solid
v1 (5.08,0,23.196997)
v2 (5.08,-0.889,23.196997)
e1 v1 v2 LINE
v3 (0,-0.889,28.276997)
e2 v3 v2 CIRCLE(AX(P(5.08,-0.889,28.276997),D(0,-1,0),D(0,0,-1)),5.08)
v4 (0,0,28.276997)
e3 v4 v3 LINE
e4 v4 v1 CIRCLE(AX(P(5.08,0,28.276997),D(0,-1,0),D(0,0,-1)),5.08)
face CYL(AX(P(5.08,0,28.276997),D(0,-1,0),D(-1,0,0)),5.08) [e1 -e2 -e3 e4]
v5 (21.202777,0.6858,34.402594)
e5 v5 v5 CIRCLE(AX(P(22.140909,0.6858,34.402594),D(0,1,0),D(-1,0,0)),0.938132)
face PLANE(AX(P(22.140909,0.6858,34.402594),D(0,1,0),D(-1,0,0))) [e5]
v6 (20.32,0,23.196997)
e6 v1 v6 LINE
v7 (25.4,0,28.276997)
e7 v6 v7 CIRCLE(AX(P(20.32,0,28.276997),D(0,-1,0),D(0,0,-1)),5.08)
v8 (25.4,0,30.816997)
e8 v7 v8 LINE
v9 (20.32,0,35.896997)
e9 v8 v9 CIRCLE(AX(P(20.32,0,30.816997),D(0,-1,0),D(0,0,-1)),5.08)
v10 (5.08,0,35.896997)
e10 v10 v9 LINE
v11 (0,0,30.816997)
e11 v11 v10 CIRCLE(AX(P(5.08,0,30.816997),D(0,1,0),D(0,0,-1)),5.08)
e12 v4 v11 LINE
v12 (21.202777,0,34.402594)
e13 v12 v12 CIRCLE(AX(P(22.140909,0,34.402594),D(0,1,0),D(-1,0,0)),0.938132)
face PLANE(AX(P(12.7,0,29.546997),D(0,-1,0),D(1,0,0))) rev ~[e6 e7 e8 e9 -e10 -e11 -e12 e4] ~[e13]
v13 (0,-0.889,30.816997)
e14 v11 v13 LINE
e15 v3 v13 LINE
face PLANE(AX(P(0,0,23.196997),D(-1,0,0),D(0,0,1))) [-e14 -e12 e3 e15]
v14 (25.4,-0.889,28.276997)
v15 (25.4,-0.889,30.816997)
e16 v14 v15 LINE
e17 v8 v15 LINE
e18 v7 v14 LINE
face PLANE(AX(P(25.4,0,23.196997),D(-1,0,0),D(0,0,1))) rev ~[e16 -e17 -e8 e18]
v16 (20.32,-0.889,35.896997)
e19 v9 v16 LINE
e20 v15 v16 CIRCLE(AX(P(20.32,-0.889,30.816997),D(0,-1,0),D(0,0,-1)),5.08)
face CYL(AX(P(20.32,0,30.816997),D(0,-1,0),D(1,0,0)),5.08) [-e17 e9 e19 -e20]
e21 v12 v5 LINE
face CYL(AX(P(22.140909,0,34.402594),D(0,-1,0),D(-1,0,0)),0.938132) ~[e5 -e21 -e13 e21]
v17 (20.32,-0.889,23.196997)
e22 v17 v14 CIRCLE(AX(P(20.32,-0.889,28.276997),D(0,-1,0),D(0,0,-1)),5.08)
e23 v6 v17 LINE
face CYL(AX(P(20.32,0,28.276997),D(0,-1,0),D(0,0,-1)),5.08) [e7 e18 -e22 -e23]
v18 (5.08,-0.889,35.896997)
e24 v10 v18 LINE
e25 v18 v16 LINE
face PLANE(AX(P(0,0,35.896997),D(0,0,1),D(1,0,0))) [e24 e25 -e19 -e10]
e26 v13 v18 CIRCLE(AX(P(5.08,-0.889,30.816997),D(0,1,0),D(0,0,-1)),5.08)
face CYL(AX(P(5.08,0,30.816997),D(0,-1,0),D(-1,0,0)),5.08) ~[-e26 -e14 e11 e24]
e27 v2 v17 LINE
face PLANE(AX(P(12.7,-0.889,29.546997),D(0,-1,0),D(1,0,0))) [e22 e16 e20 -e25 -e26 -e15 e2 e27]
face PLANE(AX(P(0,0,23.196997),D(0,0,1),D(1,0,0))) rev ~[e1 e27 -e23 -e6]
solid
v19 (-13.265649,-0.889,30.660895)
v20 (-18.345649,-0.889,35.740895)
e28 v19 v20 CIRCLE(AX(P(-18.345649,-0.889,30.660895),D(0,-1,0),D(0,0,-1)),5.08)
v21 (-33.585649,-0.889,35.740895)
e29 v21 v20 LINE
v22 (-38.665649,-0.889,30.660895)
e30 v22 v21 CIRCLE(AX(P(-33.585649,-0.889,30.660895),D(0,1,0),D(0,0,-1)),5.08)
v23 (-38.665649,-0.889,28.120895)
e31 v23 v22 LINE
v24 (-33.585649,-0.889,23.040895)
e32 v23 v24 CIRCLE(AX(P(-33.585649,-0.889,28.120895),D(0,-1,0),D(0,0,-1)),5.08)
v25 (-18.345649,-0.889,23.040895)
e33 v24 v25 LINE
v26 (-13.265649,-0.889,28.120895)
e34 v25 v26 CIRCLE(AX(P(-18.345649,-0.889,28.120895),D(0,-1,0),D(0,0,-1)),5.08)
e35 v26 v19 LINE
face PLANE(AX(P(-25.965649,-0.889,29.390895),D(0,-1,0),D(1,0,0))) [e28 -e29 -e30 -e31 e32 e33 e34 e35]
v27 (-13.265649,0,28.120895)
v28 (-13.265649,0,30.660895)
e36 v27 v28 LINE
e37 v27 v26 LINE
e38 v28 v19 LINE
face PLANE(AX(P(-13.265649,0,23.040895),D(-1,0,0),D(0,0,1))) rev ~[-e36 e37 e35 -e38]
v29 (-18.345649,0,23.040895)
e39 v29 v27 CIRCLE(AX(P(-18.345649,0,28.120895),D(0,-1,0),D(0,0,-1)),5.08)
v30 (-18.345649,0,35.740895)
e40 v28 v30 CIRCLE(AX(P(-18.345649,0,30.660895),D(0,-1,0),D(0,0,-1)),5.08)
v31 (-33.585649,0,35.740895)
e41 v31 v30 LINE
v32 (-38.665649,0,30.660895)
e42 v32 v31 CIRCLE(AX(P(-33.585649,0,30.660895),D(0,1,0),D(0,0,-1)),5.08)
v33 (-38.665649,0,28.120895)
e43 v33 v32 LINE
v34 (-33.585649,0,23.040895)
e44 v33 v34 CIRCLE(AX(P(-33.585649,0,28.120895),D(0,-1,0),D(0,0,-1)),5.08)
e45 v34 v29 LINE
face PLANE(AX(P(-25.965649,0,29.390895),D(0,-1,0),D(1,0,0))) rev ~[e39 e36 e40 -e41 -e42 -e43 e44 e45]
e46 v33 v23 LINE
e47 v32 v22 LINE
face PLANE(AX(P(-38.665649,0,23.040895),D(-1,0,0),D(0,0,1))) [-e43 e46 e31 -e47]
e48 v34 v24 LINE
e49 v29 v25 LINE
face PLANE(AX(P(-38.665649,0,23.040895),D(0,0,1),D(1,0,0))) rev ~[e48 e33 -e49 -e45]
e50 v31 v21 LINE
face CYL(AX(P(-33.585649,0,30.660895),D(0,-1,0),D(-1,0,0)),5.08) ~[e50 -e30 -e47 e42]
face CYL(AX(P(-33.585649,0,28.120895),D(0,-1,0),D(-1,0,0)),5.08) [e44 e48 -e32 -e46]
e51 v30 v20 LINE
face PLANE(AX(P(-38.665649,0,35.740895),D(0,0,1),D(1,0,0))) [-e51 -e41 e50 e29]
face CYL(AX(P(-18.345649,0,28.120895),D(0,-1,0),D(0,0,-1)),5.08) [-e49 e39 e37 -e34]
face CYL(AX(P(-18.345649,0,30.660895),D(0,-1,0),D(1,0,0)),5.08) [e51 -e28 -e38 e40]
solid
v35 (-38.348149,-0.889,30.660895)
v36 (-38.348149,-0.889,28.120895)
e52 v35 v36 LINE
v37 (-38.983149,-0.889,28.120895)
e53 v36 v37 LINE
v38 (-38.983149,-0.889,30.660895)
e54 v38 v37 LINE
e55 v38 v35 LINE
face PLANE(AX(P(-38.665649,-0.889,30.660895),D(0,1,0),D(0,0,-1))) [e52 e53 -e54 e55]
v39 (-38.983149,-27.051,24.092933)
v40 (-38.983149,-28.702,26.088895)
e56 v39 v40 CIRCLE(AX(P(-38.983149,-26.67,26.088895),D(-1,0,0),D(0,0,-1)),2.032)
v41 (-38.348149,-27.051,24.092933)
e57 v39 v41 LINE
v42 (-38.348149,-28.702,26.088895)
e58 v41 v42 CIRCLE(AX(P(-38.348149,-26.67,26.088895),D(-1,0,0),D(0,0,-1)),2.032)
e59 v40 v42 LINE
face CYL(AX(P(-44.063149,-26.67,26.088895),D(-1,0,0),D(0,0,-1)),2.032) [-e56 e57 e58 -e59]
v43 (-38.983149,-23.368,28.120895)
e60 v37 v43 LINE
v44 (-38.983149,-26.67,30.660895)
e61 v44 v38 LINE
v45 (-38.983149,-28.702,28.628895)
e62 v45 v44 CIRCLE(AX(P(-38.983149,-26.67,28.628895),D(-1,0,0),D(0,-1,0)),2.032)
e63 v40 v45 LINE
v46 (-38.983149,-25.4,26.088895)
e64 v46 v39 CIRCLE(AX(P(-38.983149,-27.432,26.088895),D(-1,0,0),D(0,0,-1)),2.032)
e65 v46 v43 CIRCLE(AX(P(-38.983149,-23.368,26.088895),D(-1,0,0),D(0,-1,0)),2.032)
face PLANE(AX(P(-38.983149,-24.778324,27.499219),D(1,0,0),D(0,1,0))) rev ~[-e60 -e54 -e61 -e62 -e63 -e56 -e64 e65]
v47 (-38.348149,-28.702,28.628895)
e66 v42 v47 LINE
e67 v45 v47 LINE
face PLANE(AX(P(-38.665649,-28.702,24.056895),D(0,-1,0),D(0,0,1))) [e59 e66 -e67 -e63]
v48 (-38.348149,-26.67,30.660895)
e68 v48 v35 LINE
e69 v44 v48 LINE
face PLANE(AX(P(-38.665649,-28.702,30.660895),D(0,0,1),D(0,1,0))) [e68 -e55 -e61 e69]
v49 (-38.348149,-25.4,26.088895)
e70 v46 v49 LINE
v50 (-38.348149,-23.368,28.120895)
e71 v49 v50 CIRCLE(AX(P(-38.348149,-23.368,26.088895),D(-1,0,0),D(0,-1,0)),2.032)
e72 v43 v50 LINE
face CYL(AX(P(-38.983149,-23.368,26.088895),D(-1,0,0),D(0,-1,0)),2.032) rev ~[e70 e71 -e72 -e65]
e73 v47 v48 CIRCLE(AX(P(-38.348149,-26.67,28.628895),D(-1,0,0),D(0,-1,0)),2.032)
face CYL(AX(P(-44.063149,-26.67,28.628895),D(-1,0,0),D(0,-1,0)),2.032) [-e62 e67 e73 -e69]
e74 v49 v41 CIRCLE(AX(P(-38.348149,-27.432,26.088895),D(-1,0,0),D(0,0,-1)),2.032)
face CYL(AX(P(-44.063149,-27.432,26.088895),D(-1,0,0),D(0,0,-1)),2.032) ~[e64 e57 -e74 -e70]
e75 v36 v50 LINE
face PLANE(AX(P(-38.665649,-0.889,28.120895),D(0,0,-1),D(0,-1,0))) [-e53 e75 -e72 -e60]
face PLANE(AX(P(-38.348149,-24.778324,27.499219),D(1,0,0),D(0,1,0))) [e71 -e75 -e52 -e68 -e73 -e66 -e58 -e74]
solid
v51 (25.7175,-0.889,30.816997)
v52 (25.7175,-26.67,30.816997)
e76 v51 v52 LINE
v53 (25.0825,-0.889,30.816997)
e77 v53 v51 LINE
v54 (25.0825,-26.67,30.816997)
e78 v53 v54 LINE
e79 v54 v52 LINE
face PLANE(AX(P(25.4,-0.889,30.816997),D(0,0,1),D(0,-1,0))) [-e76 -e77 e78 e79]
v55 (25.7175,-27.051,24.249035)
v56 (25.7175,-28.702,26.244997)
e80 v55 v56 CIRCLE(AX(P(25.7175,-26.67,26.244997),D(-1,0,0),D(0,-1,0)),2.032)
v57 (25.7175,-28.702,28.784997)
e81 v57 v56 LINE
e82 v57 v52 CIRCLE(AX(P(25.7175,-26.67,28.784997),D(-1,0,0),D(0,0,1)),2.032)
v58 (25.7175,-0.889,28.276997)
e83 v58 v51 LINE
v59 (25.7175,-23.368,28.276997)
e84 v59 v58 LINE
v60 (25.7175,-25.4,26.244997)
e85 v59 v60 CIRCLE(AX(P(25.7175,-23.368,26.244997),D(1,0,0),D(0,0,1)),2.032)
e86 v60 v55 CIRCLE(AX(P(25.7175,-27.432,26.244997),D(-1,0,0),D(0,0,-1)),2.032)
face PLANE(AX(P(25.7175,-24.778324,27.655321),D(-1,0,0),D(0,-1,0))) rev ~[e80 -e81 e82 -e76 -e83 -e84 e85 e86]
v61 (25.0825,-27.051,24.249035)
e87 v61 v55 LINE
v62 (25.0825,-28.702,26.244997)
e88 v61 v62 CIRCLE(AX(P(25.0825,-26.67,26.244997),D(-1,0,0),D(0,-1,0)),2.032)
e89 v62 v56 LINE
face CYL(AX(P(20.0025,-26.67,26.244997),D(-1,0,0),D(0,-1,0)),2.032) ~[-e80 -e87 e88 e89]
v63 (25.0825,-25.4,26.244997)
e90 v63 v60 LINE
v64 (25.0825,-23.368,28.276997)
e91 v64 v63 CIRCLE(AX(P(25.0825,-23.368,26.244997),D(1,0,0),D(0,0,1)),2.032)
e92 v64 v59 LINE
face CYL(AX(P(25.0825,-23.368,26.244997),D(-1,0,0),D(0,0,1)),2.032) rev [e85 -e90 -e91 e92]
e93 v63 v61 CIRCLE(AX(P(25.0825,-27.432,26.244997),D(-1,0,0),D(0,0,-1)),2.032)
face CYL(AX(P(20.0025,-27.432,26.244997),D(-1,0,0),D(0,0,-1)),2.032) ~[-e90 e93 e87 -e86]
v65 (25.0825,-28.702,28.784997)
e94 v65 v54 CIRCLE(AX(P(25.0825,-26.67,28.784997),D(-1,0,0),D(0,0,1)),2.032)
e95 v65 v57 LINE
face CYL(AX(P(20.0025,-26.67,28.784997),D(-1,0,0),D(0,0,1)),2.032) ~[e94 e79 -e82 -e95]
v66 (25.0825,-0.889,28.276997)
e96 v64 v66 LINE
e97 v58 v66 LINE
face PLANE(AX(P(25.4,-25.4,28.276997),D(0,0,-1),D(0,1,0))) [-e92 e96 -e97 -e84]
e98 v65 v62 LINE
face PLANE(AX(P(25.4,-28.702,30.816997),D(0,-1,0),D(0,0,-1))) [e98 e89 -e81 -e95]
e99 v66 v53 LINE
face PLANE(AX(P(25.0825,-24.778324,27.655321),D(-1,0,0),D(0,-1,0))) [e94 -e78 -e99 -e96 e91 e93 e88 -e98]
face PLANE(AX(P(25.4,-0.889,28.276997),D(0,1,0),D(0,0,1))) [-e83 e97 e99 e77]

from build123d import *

# Parameters (mm, degrees)
F0_W        = 25.4
F0_H        = 12.7
F1_DEPTH    = 0.889
F2_R        = 5.08
F2_2_R      = 5.08
F5_DEPTH    = 0.3175
F6_T1_DEPTH = 0.635
F6_T3_DEPTH = 10.795
F8_DEPTH    = 0.3175
F9_T1_DEPTH = 0.635
F9_T3_DEPTH = 10.795
F10_R       = 0.9381315748
F10_R_2     = 0.643552657
F10_R_3     = 0.4022191612
F11_DEPTH   = 0.6858


# Not quite as in the source:
# - a fillet or chamfer that OpenCascade refuses, or shapes differently, is made with other operations: its cross-section is extruded or revolved along the edge and cut away or added
# - a feature names something its author has since deleted; it is built from what else it names
# - the program builds the solid bodies; features that only make, move or delete a surface that nothing else refers to are left out


with BuildPart() as f1:
    # F0 (on Front) → F1 (new body)
    with BuildSketch(Plane.XZ):
        with Locations((-25.9656485498, 29.3908948079)):
            Rectangle(F0_W, F0_H)
    extrude(amount=F1_DEPTH)

    # F2
    f2_edges = [f1.edges().sort_by_distance(p)[0] for p in [
        (-38.665649, -0.4445, 35.740895),
        (-38.665649, -0.4445, 23.040895),
        (-13.265649, -0.4445, 23.040895),
        (-13.265649, -0.4445, 35.740895),
    ]]
    fillet(f2_edges, radius=F2_R)


with BuildPart() as f1b:
    # F0 (on Front) → F1, piece 2 (new body)
    with BuildSketch(Plane.XZ):
        with Locations((12.7, 29.546997121)):
            Rectangle(F0_W, F0_H)
    extrude(amount=F1_DEPTH)

    # F2#2
    f2_2_edges = [f1b.edges().sort_by_distance(p)[0] for p in [
        (0, -0.4445, 35.896997),
        (0, -0.4445, 23.196997),
        (25.4, -0.4445, 23.196997),
        (25.4, -0.4445, 35.896997),
    ]]
    fillet(f2_2_edges, radius=F2_2_R)

    # F10 (on face) → F11 (join)
    with BuildSketch(Plane(origin=(0, 0, 0), x_dir=(-1, 0, 0), z_dir=(0, 1, 0))):
        with Locations((-22.1409089863, 34.4025939703)):
            Circle(F10_R)
        with Locations((-22.1409089863, 34.4025939703)):
            Circle(F10_R_2, mode=Mode.SUBTRACT)
        with Locations((-22.1409089863, 34.4025939703)):
            Circle(F10_R_2)
        with Locations((-22.1409089863, 34.4025939703)):
            Circle(F10_R_3, mode=Mode.SUBTRACT)
        with Locations((-22.1409089863, 34.4025939703)):
            Circle(F10_R_3)
    extrude(amount=F11_DEPTH)


with BuildPart() as f5:
    # F4 (on face) → F5 (new body, symmetric)
    with BuildSketch(Plane.YZ.offset(25.4)):
        Polygon((-0.889, 28.276997121), (-0.889, 30.816997121), (-25.4, 30.816997121), (-28.702, 30.816997121), (-28.702, 24.212997121), (-25.4, 24.212997121), (-25.4, 28.276997121), align=None)
    extrude(amount=F5_DEPTH, both=True)

    # F6: fillet of radius 2.032 on 4 edges, made by hand

    # F6_s2 → F6_t1 (join)
    with BuildSketch(Plane.YZ.offset(25.0825)):
        with BuildLine():
            ThreePointArc((-23.368, 28.276997121), (-24.8048409794, 27.6818381003), (-25.4, 26.244997121))
            Line((-25.4, 26.244997121), (-25.4, 28.276997121))
            Line((-25.4, 28.276997121), (-23.368, 28.276997121))
        make_face()
    extrude(amount=F6_T1_DEPTH)

    # F6_s4 → F6_t3 (cut)
    with BuildSketch(Plane.YZ.offset(20.0025)):
        with BuildLine():
            ThreePointArc((-26.67, 30.816997121), (-28.1068409794, 30.2218381003), (-28.702, 28.784997121))
            Line((-28.702, 28.784997121), (-28.702, 30.816997121))
            Line((-28.702, 30.816997121), (-26.67, 30.816997121))
        make_face()
        with BuildLine():
            ThreePointArc((-28.702, 26.244997121), (-28.1068409794, 24.8081561416), (-26.67, 24.212997121))
            Line((-26.67, 24.212997121), (-28.702, 24.212997121))
            Line((-28.702, 24.212997121), (-28.702, 26.244997121))
        make_face()
        with BuildLine():
            ThreePointArc((-27.432, 24.212997121), (-25.9951590206, 24.8081561416), (-25.4, 26.244997121))
            Line((-25.4, 26.244997121), (-25.4, 24.212997121))
            Line((-25.4, 24.212997121), (-27.432, 24.212997121))
        make_face()
    extrude(amount=F6_T3_DEPTH, mode=Mode.SUBTRACT)


with BuildPart() as f8:
    # F7 (on face) → F8 (new body, symmetric)
    with BuildSketch(Plane(origin=(-38.6656485498, 0, 0), x_dir=(0, -1, 0), z_dir=(-1, 0, 0))):
        Polygon((25.4, 30.6608948079), (0.889, 30.6608948079), (0.889, 28.1208948079), (25.4, 28.1208948079), (25.4, 24.0568948079), (28.702, 24.0568948079), (28.702, 30.6608948079), align=None)
    extrude(amount=F8_DEPTH, both=True)

    # F9: fillet of radius 2.032 on 4 edges, made by hand

    # F9_s2 → F9_t1 (join)
    with BuildSketch(Plane.YZ.offset(-38.9831485498)):
        with BuildLine():
            ThreePointArc((-25.4, 26.0888948079), (-24.8048409794, 27.5257357872), (-23.368, 28.1208948079))
            Line((-23.368, 28.1208948079), (-25.4, 28.1208948079))
            Line((-25.4, 28.1208948079), (-25.4, 26.0888948079))
        make_face()
    extrude(amount=F9_T1_DEPTH)

    # F9_s4 → F9_t3 (cut)
    with BuildSketch(Plane.YZ.offset(-44.0631485498)):
        with BuildLine():
            ThreePointArc((-27.432, 24.0568948079), (-25.9951590206, 24.6520538285), (-25.4, 26.0888948079))
            Line((-25.4, 26.0888948079), (-25.4, 24.0568948079))
            Line((-25.4, 24.0568948079), (-27.432, 24.0568948079))
        make_face()
        with BuildLine():
            ThreePointArc((-26.67, 24.0568948079), (-28.1068409794, 24.6520538285), (-28.702, 26.0888948079))
            Line((-28.702, 26.0888948079), (-28.702, 24.0568948079))
            Line((-28.702, 24.0568948079), (-26.67, 24.0568948079))
        make_face()
        with BuildLine():
            ThreePointArc((-28.702, 28.6288948079), (-28.1068409794, 30.0657357872), (-26.67, 30.6608948079))
            Line((-26.67, 30.6608948079), (-28.702, 30.6608948079))
            Line((-28.702, 30.6608948079), (-28.702, 28.6288948079))
        make_face()
    extrude(amount=F9_T3_DEPTH, mode=Mode.SUBTRACT)


solid = Compound([f1.part, f1b.part, f5.part, f8.part])
